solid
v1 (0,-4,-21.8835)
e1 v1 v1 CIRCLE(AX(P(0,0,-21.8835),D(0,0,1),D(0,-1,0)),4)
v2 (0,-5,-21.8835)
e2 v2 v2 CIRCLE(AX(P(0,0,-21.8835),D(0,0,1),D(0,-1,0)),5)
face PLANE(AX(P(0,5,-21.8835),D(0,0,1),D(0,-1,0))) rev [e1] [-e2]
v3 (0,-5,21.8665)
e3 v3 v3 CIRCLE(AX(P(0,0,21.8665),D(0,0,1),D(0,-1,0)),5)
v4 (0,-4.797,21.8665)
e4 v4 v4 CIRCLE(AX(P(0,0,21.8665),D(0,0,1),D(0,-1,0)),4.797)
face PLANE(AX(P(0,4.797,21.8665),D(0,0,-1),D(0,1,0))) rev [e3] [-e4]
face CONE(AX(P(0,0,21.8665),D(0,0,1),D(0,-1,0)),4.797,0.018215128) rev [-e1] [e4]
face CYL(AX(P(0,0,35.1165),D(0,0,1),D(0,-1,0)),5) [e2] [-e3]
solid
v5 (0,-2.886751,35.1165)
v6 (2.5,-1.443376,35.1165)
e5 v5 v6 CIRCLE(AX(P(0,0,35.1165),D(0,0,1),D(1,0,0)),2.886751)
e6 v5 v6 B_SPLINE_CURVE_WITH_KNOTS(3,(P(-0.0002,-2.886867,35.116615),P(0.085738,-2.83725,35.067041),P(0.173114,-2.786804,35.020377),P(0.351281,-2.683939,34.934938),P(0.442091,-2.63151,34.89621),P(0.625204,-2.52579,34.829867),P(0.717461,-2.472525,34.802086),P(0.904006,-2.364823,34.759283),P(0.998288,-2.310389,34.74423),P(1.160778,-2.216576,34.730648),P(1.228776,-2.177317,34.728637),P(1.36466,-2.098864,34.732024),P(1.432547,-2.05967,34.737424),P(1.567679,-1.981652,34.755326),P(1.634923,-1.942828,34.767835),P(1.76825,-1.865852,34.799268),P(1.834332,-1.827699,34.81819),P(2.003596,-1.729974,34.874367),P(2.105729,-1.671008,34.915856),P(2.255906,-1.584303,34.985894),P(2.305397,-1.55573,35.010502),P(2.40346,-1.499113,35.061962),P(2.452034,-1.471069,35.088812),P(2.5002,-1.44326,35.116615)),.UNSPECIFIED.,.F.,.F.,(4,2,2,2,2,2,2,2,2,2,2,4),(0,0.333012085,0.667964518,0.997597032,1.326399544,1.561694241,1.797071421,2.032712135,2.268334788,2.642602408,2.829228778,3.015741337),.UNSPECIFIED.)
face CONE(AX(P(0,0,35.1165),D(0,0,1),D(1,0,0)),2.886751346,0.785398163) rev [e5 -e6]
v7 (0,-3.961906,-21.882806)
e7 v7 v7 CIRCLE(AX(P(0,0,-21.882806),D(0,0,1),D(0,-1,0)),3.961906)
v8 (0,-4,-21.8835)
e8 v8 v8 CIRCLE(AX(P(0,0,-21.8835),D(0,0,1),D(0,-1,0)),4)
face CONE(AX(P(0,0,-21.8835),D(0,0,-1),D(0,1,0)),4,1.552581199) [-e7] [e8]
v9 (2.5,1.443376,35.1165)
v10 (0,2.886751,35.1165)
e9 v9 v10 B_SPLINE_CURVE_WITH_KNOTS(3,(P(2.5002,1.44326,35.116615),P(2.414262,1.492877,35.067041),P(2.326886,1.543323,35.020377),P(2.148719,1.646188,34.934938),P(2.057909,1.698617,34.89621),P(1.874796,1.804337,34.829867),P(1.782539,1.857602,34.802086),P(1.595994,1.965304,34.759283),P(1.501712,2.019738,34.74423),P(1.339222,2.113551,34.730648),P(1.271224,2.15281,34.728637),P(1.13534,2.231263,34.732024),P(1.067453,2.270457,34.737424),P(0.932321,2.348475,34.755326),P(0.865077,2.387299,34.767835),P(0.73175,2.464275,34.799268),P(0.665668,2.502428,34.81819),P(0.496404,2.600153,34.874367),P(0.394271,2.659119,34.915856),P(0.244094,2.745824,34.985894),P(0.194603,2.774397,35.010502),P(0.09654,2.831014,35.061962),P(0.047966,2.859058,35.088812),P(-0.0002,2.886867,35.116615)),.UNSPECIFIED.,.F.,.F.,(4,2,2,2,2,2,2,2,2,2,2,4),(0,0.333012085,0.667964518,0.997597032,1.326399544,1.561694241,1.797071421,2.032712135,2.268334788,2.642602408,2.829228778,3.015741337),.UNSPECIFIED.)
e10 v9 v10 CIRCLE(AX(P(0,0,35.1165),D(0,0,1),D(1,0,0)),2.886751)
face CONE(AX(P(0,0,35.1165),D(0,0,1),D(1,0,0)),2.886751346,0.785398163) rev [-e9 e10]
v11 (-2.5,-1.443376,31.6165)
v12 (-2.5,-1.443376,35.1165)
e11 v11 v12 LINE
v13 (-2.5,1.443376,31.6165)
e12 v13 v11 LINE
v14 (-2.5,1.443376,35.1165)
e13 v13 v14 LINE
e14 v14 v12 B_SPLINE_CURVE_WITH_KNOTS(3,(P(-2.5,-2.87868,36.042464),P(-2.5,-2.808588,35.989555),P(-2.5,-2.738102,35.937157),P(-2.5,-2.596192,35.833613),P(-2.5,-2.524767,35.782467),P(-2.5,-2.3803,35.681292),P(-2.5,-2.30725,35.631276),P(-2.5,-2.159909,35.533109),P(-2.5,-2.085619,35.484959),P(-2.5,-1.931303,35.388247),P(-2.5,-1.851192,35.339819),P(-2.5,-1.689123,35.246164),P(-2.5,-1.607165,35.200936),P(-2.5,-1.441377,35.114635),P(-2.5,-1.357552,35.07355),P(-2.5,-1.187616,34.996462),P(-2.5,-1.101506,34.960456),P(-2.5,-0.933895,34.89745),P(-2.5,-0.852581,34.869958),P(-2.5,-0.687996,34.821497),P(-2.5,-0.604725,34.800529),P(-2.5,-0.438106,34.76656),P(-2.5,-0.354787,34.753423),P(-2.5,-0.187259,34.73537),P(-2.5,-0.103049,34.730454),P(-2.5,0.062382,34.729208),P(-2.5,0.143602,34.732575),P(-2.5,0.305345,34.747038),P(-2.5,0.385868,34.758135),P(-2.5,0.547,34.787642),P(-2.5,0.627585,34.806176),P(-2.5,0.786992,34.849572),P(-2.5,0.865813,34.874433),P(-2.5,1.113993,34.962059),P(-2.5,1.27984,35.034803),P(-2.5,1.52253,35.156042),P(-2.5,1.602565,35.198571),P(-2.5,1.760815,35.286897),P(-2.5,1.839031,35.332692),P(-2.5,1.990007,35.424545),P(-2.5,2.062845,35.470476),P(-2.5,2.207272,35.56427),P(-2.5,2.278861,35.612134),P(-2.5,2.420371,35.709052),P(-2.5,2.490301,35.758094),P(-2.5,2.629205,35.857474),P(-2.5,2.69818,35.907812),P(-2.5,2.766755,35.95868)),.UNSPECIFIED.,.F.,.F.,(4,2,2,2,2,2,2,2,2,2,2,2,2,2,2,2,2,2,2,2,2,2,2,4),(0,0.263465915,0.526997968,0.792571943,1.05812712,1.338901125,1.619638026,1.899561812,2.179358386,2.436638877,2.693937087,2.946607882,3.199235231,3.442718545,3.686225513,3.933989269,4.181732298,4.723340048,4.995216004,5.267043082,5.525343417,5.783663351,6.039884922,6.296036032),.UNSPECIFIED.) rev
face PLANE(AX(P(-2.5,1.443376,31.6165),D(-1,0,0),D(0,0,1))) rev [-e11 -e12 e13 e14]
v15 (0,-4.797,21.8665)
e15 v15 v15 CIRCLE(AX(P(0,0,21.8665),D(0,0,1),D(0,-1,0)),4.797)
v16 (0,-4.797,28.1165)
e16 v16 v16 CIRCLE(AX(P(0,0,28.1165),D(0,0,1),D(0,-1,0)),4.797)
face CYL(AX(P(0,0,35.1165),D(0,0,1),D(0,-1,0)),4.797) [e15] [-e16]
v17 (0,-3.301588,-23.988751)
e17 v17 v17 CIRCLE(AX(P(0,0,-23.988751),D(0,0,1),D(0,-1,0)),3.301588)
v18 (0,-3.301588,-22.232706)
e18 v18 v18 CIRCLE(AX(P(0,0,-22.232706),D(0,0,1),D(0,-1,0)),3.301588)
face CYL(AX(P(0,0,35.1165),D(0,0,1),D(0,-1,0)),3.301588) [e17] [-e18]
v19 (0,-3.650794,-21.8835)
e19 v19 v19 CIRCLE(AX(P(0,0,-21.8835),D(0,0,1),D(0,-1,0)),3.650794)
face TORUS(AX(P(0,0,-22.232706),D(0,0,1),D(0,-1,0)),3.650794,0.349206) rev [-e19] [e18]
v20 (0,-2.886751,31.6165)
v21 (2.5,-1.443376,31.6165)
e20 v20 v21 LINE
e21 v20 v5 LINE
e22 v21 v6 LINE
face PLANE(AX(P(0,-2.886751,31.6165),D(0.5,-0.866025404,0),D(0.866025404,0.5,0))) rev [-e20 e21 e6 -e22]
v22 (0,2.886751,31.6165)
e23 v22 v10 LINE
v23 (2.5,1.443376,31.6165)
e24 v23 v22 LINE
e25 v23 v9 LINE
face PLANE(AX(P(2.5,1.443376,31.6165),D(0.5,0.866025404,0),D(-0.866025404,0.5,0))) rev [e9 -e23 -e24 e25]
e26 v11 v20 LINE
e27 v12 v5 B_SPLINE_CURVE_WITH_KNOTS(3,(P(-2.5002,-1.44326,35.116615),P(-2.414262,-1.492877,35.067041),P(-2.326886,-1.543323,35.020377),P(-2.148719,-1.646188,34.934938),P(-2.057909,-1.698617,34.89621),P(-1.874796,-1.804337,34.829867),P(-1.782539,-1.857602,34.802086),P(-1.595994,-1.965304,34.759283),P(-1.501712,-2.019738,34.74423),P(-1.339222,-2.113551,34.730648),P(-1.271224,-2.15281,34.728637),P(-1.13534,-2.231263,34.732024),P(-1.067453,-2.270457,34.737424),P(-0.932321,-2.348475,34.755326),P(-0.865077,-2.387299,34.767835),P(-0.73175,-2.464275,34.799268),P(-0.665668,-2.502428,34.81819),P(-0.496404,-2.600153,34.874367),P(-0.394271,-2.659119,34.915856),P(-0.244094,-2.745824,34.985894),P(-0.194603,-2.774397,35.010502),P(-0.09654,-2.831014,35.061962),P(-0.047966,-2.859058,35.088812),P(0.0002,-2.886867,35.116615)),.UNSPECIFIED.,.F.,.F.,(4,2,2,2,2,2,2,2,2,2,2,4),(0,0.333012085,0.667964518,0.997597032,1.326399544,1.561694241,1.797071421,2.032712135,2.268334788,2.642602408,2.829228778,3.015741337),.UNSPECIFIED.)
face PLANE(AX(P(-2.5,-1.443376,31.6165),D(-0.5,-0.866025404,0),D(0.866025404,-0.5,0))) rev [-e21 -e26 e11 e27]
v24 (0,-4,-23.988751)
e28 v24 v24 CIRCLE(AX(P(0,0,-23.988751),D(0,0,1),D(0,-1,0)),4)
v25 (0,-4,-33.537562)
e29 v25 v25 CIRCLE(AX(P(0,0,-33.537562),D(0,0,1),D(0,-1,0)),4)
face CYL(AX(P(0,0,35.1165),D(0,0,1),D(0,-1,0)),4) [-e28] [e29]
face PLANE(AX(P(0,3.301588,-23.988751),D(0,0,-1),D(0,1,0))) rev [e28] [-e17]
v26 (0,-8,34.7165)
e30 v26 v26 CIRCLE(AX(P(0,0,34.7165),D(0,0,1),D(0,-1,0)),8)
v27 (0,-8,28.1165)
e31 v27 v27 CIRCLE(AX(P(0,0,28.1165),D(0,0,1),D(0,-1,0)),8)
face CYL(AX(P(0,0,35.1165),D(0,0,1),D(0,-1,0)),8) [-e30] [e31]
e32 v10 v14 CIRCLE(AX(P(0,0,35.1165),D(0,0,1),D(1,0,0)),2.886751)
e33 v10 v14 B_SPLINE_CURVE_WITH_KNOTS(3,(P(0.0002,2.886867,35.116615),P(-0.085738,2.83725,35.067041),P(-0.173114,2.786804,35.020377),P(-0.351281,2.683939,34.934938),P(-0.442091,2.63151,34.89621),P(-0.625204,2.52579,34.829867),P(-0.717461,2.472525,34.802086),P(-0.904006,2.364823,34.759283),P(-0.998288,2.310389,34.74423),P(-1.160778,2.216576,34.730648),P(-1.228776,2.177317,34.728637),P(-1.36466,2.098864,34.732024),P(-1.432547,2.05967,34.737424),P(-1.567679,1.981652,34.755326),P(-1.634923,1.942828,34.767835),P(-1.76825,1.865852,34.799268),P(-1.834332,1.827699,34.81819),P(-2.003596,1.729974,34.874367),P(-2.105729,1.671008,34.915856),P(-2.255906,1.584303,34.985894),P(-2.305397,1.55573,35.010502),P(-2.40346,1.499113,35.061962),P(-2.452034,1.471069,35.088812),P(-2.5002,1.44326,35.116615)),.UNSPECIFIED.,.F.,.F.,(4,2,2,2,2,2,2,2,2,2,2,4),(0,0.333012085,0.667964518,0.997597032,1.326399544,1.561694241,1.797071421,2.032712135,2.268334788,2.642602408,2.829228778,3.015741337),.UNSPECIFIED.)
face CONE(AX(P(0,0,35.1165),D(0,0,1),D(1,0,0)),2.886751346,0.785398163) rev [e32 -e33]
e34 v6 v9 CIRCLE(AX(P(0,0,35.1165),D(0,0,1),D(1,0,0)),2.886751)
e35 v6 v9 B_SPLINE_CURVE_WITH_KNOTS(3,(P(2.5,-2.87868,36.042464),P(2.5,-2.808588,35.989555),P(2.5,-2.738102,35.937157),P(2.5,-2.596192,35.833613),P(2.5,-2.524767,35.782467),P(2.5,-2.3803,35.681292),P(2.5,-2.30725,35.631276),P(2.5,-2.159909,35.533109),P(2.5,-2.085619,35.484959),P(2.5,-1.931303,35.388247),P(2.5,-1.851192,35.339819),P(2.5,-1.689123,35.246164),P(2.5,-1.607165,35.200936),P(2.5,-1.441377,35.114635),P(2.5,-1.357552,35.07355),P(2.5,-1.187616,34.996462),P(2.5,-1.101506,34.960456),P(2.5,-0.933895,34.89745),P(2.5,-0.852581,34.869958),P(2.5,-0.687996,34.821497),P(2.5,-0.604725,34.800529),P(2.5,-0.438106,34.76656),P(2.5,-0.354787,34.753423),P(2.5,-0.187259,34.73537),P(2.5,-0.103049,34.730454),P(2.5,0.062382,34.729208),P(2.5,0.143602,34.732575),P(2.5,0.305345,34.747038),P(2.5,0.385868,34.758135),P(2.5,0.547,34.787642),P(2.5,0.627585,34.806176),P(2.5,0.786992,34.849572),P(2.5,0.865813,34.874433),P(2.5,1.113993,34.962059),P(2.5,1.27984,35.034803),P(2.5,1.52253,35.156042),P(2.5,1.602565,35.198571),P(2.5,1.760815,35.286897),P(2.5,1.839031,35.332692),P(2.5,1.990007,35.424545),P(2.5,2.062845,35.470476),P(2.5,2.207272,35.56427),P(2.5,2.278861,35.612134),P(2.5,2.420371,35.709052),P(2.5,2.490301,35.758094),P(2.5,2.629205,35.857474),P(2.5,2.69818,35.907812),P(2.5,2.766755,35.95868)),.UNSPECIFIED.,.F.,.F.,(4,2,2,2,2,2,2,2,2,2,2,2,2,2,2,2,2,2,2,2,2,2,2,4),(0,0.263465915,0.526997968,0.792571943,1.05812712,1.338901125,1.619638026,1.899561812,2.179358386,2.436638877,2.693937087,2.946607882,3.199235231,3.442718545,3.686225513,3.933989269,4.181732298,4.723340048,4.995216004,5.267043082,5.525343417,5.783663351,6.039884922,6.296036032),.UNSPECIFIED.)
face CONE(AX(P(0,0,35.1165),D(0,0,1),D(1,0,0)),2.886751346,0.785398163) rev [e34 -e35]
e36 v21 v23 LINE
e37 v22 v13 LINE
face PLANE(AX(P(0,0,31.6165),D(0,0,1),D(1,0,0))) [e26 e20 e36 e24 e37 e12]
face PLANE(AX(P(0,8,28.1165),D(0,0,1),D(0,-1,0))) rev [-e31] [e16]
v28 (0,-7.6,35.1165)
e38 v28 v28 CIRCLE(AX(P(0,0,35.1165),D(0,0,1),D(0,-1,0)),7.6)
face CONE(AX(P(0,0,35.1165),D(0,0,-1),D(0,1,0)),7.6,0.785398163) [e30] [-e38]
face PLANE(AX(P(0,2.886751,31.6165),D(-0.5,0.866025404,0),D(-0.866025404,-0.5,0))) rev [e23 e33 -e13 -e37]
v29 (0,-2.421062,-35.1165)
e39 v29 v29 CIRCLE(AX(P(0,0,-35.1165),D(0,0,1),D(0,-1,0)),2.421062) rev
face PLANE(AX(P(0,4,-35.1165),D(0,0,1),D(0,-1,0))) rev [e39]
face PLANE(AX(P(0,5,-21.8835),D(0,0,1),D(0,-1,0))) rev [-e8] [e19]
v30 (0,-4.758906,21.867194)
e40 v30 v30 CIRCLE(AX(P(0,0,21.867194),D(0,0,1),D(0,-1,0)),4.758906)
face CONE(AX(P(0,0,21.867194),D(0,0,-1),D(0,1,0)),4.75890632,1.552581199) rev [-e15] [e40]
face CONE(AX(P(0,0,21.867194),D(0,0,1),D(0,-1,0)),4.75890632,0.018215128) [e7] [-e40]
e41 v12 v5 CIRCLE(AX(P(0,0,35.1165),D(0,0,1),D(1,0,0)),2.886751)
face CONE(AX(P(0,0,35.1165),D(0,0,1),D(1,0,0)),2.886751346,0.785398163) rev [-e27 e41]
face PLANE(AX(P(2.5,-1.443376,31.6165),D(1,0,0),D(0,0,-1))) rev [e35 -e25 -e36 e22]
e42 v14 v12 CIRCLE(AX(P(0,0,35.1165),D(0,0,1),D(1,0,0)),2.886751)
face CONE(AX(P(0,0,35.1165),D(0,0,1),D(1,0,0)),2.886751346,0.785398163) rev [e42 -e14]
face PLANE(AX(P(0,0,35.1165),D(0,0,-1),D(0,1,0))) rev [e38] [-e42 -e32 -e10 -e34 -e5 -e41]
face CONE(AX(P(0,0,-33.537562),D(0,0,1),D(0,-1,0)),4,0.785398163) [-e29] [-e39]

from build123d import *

# Parameters (mm, degrees)
CUT_EXTRUDE1_START = 35.1165
CUT_EXTRUDE1_DEPTH = 3.5
CHAMFER2_SIZE      = 1.578938402


# Read off the part's stored shape, not the designer's step: Cut-Revolve-Thin1
with BuildPart() as part:
    # Sketch3 → Revolve1 (revolve)
    with BuildSketch(Plane(origin=(0, 0, 0), x_dir=(0, 0, -1), z_dir=(1, 0, 0)), mode=Mode.PRIVATE) as revolve1_sk:
        with BuildLine():
            Line((-35.1165, 0), (-35.1165, 7.48))
            Line((-35.1165, 7.48), (-35.1165, 8))
            Line((-35.1165, 8), (-28.6365, 8))
            Line((-28.6365, 8), (-28.1165, 8))
            Line((-28.1165, 8), (-28.1165, 4.797))
            Line((-28.1165, 4.797), (-21.8665, 4.797))
            Line((-21.8665, 4.797), (-21.8665, 5))
            Line((-21.8665, 5), (21.8835, 5))
            Line((21.8835, 5), (21.8835, 3.650794))
            ThreePointArc((21.8835, 3.650794), (21.985780069, 3.403868069), (22.232706, 3.301588))
            Line((22.232706, 3.301588), (23.988751203, 3.301588))
            Line((23.988751203, 3.301588), (23.988751203, 4))
            Line((23.988751203, 4), (34.179, 4))
            Line((34.179, 4), (35.1165, 4))
            Line((35.1165, 4), (35.1165, 0))
            Line((35.1165, 0), (-35.1165, 0))
        make_face()
    revolve(revolve1_sk.sketch.rotate(Axis((0, 0, 35.1165), (0, 0, -1)), 180), axis=Axis((0, 0, 35.1165), (0, 0, -1)))

    # Cut-Revolve-Thin1 outline → Cut-Revolve-Thin1 (revolve, cut)
    with BuildSketch(Plane.XZ):
        Polygon((4.75890632, 21.867193958), (3.96190632, -21.882806042), (4, -21.8835), (4.797, 21.8665), align=None)
    revolve(axis=Axis((0, 0, 0), (0, 0, 1)), mode=Mode.SUBTRACT)

    # Sketch4 → Cut-Extrude1 (cut)
    with BuildSketch(Plane.XY.offset(CUT_EXTRUDE1_START)):
        Polygon((0, 2.886751346), (-2.5, 1.443375673), (-2.5, -1.443375673), (0, -2.886751346), (2.5, -1.443375673), (2.5, 1.443375673), align=None)
    extrude(amount=-CUT_EXTRUDE1_DEPTH, mode=Mode.SUBTRACT)

    # Cut-Extrude2 cone 1 section (through the dimple's axis) → Cut-Extrude2 (revolve, cut)
    with BuildSketch(Plane(origin=(0, 0, 35.1165), x_dir=(0, -1, 0), z_dir=(1, 0, 0))):
        Polygon((0, 0), (2.886751346, 0), (0, 2.886751346), align=None)
    revolve(axis=Axis((0, 0, 35.1165), (0, 0, -1)), mode=Mode.SUBTRACT)

    # Chamfer2
    chamfer2_edges = [part.edges().sort_by_distance(p)[0] for p in [
        (0, 4, -35.1165),
    ]]
    chamfer(chamfer2_edges, length=CHAMFER2_SIZE)

    # Sketch10 → Cut-Revolve2 (revolve, cut)
    with BuildSketch(Plane(origin=(0, 0, 0), x_dir=(0, 0, -1), z_dir=(1, 0, 0)), mode=Mode.PRIVATE) as cut_revolve2_sk:
        Polygon((-35.1165, 7.6), (-34.7165, 8), (-35.1165, 8), align=None)
    revolve(cut_revolve2_sk.sketch.rotate(Axis((0, 0, 35.1165), (0, 0, -1)), 180), axis=Axis((0, 0, 35.1165), (0, 0, -1)), mode=Mode.SUBTRACT)


solid = part.part
